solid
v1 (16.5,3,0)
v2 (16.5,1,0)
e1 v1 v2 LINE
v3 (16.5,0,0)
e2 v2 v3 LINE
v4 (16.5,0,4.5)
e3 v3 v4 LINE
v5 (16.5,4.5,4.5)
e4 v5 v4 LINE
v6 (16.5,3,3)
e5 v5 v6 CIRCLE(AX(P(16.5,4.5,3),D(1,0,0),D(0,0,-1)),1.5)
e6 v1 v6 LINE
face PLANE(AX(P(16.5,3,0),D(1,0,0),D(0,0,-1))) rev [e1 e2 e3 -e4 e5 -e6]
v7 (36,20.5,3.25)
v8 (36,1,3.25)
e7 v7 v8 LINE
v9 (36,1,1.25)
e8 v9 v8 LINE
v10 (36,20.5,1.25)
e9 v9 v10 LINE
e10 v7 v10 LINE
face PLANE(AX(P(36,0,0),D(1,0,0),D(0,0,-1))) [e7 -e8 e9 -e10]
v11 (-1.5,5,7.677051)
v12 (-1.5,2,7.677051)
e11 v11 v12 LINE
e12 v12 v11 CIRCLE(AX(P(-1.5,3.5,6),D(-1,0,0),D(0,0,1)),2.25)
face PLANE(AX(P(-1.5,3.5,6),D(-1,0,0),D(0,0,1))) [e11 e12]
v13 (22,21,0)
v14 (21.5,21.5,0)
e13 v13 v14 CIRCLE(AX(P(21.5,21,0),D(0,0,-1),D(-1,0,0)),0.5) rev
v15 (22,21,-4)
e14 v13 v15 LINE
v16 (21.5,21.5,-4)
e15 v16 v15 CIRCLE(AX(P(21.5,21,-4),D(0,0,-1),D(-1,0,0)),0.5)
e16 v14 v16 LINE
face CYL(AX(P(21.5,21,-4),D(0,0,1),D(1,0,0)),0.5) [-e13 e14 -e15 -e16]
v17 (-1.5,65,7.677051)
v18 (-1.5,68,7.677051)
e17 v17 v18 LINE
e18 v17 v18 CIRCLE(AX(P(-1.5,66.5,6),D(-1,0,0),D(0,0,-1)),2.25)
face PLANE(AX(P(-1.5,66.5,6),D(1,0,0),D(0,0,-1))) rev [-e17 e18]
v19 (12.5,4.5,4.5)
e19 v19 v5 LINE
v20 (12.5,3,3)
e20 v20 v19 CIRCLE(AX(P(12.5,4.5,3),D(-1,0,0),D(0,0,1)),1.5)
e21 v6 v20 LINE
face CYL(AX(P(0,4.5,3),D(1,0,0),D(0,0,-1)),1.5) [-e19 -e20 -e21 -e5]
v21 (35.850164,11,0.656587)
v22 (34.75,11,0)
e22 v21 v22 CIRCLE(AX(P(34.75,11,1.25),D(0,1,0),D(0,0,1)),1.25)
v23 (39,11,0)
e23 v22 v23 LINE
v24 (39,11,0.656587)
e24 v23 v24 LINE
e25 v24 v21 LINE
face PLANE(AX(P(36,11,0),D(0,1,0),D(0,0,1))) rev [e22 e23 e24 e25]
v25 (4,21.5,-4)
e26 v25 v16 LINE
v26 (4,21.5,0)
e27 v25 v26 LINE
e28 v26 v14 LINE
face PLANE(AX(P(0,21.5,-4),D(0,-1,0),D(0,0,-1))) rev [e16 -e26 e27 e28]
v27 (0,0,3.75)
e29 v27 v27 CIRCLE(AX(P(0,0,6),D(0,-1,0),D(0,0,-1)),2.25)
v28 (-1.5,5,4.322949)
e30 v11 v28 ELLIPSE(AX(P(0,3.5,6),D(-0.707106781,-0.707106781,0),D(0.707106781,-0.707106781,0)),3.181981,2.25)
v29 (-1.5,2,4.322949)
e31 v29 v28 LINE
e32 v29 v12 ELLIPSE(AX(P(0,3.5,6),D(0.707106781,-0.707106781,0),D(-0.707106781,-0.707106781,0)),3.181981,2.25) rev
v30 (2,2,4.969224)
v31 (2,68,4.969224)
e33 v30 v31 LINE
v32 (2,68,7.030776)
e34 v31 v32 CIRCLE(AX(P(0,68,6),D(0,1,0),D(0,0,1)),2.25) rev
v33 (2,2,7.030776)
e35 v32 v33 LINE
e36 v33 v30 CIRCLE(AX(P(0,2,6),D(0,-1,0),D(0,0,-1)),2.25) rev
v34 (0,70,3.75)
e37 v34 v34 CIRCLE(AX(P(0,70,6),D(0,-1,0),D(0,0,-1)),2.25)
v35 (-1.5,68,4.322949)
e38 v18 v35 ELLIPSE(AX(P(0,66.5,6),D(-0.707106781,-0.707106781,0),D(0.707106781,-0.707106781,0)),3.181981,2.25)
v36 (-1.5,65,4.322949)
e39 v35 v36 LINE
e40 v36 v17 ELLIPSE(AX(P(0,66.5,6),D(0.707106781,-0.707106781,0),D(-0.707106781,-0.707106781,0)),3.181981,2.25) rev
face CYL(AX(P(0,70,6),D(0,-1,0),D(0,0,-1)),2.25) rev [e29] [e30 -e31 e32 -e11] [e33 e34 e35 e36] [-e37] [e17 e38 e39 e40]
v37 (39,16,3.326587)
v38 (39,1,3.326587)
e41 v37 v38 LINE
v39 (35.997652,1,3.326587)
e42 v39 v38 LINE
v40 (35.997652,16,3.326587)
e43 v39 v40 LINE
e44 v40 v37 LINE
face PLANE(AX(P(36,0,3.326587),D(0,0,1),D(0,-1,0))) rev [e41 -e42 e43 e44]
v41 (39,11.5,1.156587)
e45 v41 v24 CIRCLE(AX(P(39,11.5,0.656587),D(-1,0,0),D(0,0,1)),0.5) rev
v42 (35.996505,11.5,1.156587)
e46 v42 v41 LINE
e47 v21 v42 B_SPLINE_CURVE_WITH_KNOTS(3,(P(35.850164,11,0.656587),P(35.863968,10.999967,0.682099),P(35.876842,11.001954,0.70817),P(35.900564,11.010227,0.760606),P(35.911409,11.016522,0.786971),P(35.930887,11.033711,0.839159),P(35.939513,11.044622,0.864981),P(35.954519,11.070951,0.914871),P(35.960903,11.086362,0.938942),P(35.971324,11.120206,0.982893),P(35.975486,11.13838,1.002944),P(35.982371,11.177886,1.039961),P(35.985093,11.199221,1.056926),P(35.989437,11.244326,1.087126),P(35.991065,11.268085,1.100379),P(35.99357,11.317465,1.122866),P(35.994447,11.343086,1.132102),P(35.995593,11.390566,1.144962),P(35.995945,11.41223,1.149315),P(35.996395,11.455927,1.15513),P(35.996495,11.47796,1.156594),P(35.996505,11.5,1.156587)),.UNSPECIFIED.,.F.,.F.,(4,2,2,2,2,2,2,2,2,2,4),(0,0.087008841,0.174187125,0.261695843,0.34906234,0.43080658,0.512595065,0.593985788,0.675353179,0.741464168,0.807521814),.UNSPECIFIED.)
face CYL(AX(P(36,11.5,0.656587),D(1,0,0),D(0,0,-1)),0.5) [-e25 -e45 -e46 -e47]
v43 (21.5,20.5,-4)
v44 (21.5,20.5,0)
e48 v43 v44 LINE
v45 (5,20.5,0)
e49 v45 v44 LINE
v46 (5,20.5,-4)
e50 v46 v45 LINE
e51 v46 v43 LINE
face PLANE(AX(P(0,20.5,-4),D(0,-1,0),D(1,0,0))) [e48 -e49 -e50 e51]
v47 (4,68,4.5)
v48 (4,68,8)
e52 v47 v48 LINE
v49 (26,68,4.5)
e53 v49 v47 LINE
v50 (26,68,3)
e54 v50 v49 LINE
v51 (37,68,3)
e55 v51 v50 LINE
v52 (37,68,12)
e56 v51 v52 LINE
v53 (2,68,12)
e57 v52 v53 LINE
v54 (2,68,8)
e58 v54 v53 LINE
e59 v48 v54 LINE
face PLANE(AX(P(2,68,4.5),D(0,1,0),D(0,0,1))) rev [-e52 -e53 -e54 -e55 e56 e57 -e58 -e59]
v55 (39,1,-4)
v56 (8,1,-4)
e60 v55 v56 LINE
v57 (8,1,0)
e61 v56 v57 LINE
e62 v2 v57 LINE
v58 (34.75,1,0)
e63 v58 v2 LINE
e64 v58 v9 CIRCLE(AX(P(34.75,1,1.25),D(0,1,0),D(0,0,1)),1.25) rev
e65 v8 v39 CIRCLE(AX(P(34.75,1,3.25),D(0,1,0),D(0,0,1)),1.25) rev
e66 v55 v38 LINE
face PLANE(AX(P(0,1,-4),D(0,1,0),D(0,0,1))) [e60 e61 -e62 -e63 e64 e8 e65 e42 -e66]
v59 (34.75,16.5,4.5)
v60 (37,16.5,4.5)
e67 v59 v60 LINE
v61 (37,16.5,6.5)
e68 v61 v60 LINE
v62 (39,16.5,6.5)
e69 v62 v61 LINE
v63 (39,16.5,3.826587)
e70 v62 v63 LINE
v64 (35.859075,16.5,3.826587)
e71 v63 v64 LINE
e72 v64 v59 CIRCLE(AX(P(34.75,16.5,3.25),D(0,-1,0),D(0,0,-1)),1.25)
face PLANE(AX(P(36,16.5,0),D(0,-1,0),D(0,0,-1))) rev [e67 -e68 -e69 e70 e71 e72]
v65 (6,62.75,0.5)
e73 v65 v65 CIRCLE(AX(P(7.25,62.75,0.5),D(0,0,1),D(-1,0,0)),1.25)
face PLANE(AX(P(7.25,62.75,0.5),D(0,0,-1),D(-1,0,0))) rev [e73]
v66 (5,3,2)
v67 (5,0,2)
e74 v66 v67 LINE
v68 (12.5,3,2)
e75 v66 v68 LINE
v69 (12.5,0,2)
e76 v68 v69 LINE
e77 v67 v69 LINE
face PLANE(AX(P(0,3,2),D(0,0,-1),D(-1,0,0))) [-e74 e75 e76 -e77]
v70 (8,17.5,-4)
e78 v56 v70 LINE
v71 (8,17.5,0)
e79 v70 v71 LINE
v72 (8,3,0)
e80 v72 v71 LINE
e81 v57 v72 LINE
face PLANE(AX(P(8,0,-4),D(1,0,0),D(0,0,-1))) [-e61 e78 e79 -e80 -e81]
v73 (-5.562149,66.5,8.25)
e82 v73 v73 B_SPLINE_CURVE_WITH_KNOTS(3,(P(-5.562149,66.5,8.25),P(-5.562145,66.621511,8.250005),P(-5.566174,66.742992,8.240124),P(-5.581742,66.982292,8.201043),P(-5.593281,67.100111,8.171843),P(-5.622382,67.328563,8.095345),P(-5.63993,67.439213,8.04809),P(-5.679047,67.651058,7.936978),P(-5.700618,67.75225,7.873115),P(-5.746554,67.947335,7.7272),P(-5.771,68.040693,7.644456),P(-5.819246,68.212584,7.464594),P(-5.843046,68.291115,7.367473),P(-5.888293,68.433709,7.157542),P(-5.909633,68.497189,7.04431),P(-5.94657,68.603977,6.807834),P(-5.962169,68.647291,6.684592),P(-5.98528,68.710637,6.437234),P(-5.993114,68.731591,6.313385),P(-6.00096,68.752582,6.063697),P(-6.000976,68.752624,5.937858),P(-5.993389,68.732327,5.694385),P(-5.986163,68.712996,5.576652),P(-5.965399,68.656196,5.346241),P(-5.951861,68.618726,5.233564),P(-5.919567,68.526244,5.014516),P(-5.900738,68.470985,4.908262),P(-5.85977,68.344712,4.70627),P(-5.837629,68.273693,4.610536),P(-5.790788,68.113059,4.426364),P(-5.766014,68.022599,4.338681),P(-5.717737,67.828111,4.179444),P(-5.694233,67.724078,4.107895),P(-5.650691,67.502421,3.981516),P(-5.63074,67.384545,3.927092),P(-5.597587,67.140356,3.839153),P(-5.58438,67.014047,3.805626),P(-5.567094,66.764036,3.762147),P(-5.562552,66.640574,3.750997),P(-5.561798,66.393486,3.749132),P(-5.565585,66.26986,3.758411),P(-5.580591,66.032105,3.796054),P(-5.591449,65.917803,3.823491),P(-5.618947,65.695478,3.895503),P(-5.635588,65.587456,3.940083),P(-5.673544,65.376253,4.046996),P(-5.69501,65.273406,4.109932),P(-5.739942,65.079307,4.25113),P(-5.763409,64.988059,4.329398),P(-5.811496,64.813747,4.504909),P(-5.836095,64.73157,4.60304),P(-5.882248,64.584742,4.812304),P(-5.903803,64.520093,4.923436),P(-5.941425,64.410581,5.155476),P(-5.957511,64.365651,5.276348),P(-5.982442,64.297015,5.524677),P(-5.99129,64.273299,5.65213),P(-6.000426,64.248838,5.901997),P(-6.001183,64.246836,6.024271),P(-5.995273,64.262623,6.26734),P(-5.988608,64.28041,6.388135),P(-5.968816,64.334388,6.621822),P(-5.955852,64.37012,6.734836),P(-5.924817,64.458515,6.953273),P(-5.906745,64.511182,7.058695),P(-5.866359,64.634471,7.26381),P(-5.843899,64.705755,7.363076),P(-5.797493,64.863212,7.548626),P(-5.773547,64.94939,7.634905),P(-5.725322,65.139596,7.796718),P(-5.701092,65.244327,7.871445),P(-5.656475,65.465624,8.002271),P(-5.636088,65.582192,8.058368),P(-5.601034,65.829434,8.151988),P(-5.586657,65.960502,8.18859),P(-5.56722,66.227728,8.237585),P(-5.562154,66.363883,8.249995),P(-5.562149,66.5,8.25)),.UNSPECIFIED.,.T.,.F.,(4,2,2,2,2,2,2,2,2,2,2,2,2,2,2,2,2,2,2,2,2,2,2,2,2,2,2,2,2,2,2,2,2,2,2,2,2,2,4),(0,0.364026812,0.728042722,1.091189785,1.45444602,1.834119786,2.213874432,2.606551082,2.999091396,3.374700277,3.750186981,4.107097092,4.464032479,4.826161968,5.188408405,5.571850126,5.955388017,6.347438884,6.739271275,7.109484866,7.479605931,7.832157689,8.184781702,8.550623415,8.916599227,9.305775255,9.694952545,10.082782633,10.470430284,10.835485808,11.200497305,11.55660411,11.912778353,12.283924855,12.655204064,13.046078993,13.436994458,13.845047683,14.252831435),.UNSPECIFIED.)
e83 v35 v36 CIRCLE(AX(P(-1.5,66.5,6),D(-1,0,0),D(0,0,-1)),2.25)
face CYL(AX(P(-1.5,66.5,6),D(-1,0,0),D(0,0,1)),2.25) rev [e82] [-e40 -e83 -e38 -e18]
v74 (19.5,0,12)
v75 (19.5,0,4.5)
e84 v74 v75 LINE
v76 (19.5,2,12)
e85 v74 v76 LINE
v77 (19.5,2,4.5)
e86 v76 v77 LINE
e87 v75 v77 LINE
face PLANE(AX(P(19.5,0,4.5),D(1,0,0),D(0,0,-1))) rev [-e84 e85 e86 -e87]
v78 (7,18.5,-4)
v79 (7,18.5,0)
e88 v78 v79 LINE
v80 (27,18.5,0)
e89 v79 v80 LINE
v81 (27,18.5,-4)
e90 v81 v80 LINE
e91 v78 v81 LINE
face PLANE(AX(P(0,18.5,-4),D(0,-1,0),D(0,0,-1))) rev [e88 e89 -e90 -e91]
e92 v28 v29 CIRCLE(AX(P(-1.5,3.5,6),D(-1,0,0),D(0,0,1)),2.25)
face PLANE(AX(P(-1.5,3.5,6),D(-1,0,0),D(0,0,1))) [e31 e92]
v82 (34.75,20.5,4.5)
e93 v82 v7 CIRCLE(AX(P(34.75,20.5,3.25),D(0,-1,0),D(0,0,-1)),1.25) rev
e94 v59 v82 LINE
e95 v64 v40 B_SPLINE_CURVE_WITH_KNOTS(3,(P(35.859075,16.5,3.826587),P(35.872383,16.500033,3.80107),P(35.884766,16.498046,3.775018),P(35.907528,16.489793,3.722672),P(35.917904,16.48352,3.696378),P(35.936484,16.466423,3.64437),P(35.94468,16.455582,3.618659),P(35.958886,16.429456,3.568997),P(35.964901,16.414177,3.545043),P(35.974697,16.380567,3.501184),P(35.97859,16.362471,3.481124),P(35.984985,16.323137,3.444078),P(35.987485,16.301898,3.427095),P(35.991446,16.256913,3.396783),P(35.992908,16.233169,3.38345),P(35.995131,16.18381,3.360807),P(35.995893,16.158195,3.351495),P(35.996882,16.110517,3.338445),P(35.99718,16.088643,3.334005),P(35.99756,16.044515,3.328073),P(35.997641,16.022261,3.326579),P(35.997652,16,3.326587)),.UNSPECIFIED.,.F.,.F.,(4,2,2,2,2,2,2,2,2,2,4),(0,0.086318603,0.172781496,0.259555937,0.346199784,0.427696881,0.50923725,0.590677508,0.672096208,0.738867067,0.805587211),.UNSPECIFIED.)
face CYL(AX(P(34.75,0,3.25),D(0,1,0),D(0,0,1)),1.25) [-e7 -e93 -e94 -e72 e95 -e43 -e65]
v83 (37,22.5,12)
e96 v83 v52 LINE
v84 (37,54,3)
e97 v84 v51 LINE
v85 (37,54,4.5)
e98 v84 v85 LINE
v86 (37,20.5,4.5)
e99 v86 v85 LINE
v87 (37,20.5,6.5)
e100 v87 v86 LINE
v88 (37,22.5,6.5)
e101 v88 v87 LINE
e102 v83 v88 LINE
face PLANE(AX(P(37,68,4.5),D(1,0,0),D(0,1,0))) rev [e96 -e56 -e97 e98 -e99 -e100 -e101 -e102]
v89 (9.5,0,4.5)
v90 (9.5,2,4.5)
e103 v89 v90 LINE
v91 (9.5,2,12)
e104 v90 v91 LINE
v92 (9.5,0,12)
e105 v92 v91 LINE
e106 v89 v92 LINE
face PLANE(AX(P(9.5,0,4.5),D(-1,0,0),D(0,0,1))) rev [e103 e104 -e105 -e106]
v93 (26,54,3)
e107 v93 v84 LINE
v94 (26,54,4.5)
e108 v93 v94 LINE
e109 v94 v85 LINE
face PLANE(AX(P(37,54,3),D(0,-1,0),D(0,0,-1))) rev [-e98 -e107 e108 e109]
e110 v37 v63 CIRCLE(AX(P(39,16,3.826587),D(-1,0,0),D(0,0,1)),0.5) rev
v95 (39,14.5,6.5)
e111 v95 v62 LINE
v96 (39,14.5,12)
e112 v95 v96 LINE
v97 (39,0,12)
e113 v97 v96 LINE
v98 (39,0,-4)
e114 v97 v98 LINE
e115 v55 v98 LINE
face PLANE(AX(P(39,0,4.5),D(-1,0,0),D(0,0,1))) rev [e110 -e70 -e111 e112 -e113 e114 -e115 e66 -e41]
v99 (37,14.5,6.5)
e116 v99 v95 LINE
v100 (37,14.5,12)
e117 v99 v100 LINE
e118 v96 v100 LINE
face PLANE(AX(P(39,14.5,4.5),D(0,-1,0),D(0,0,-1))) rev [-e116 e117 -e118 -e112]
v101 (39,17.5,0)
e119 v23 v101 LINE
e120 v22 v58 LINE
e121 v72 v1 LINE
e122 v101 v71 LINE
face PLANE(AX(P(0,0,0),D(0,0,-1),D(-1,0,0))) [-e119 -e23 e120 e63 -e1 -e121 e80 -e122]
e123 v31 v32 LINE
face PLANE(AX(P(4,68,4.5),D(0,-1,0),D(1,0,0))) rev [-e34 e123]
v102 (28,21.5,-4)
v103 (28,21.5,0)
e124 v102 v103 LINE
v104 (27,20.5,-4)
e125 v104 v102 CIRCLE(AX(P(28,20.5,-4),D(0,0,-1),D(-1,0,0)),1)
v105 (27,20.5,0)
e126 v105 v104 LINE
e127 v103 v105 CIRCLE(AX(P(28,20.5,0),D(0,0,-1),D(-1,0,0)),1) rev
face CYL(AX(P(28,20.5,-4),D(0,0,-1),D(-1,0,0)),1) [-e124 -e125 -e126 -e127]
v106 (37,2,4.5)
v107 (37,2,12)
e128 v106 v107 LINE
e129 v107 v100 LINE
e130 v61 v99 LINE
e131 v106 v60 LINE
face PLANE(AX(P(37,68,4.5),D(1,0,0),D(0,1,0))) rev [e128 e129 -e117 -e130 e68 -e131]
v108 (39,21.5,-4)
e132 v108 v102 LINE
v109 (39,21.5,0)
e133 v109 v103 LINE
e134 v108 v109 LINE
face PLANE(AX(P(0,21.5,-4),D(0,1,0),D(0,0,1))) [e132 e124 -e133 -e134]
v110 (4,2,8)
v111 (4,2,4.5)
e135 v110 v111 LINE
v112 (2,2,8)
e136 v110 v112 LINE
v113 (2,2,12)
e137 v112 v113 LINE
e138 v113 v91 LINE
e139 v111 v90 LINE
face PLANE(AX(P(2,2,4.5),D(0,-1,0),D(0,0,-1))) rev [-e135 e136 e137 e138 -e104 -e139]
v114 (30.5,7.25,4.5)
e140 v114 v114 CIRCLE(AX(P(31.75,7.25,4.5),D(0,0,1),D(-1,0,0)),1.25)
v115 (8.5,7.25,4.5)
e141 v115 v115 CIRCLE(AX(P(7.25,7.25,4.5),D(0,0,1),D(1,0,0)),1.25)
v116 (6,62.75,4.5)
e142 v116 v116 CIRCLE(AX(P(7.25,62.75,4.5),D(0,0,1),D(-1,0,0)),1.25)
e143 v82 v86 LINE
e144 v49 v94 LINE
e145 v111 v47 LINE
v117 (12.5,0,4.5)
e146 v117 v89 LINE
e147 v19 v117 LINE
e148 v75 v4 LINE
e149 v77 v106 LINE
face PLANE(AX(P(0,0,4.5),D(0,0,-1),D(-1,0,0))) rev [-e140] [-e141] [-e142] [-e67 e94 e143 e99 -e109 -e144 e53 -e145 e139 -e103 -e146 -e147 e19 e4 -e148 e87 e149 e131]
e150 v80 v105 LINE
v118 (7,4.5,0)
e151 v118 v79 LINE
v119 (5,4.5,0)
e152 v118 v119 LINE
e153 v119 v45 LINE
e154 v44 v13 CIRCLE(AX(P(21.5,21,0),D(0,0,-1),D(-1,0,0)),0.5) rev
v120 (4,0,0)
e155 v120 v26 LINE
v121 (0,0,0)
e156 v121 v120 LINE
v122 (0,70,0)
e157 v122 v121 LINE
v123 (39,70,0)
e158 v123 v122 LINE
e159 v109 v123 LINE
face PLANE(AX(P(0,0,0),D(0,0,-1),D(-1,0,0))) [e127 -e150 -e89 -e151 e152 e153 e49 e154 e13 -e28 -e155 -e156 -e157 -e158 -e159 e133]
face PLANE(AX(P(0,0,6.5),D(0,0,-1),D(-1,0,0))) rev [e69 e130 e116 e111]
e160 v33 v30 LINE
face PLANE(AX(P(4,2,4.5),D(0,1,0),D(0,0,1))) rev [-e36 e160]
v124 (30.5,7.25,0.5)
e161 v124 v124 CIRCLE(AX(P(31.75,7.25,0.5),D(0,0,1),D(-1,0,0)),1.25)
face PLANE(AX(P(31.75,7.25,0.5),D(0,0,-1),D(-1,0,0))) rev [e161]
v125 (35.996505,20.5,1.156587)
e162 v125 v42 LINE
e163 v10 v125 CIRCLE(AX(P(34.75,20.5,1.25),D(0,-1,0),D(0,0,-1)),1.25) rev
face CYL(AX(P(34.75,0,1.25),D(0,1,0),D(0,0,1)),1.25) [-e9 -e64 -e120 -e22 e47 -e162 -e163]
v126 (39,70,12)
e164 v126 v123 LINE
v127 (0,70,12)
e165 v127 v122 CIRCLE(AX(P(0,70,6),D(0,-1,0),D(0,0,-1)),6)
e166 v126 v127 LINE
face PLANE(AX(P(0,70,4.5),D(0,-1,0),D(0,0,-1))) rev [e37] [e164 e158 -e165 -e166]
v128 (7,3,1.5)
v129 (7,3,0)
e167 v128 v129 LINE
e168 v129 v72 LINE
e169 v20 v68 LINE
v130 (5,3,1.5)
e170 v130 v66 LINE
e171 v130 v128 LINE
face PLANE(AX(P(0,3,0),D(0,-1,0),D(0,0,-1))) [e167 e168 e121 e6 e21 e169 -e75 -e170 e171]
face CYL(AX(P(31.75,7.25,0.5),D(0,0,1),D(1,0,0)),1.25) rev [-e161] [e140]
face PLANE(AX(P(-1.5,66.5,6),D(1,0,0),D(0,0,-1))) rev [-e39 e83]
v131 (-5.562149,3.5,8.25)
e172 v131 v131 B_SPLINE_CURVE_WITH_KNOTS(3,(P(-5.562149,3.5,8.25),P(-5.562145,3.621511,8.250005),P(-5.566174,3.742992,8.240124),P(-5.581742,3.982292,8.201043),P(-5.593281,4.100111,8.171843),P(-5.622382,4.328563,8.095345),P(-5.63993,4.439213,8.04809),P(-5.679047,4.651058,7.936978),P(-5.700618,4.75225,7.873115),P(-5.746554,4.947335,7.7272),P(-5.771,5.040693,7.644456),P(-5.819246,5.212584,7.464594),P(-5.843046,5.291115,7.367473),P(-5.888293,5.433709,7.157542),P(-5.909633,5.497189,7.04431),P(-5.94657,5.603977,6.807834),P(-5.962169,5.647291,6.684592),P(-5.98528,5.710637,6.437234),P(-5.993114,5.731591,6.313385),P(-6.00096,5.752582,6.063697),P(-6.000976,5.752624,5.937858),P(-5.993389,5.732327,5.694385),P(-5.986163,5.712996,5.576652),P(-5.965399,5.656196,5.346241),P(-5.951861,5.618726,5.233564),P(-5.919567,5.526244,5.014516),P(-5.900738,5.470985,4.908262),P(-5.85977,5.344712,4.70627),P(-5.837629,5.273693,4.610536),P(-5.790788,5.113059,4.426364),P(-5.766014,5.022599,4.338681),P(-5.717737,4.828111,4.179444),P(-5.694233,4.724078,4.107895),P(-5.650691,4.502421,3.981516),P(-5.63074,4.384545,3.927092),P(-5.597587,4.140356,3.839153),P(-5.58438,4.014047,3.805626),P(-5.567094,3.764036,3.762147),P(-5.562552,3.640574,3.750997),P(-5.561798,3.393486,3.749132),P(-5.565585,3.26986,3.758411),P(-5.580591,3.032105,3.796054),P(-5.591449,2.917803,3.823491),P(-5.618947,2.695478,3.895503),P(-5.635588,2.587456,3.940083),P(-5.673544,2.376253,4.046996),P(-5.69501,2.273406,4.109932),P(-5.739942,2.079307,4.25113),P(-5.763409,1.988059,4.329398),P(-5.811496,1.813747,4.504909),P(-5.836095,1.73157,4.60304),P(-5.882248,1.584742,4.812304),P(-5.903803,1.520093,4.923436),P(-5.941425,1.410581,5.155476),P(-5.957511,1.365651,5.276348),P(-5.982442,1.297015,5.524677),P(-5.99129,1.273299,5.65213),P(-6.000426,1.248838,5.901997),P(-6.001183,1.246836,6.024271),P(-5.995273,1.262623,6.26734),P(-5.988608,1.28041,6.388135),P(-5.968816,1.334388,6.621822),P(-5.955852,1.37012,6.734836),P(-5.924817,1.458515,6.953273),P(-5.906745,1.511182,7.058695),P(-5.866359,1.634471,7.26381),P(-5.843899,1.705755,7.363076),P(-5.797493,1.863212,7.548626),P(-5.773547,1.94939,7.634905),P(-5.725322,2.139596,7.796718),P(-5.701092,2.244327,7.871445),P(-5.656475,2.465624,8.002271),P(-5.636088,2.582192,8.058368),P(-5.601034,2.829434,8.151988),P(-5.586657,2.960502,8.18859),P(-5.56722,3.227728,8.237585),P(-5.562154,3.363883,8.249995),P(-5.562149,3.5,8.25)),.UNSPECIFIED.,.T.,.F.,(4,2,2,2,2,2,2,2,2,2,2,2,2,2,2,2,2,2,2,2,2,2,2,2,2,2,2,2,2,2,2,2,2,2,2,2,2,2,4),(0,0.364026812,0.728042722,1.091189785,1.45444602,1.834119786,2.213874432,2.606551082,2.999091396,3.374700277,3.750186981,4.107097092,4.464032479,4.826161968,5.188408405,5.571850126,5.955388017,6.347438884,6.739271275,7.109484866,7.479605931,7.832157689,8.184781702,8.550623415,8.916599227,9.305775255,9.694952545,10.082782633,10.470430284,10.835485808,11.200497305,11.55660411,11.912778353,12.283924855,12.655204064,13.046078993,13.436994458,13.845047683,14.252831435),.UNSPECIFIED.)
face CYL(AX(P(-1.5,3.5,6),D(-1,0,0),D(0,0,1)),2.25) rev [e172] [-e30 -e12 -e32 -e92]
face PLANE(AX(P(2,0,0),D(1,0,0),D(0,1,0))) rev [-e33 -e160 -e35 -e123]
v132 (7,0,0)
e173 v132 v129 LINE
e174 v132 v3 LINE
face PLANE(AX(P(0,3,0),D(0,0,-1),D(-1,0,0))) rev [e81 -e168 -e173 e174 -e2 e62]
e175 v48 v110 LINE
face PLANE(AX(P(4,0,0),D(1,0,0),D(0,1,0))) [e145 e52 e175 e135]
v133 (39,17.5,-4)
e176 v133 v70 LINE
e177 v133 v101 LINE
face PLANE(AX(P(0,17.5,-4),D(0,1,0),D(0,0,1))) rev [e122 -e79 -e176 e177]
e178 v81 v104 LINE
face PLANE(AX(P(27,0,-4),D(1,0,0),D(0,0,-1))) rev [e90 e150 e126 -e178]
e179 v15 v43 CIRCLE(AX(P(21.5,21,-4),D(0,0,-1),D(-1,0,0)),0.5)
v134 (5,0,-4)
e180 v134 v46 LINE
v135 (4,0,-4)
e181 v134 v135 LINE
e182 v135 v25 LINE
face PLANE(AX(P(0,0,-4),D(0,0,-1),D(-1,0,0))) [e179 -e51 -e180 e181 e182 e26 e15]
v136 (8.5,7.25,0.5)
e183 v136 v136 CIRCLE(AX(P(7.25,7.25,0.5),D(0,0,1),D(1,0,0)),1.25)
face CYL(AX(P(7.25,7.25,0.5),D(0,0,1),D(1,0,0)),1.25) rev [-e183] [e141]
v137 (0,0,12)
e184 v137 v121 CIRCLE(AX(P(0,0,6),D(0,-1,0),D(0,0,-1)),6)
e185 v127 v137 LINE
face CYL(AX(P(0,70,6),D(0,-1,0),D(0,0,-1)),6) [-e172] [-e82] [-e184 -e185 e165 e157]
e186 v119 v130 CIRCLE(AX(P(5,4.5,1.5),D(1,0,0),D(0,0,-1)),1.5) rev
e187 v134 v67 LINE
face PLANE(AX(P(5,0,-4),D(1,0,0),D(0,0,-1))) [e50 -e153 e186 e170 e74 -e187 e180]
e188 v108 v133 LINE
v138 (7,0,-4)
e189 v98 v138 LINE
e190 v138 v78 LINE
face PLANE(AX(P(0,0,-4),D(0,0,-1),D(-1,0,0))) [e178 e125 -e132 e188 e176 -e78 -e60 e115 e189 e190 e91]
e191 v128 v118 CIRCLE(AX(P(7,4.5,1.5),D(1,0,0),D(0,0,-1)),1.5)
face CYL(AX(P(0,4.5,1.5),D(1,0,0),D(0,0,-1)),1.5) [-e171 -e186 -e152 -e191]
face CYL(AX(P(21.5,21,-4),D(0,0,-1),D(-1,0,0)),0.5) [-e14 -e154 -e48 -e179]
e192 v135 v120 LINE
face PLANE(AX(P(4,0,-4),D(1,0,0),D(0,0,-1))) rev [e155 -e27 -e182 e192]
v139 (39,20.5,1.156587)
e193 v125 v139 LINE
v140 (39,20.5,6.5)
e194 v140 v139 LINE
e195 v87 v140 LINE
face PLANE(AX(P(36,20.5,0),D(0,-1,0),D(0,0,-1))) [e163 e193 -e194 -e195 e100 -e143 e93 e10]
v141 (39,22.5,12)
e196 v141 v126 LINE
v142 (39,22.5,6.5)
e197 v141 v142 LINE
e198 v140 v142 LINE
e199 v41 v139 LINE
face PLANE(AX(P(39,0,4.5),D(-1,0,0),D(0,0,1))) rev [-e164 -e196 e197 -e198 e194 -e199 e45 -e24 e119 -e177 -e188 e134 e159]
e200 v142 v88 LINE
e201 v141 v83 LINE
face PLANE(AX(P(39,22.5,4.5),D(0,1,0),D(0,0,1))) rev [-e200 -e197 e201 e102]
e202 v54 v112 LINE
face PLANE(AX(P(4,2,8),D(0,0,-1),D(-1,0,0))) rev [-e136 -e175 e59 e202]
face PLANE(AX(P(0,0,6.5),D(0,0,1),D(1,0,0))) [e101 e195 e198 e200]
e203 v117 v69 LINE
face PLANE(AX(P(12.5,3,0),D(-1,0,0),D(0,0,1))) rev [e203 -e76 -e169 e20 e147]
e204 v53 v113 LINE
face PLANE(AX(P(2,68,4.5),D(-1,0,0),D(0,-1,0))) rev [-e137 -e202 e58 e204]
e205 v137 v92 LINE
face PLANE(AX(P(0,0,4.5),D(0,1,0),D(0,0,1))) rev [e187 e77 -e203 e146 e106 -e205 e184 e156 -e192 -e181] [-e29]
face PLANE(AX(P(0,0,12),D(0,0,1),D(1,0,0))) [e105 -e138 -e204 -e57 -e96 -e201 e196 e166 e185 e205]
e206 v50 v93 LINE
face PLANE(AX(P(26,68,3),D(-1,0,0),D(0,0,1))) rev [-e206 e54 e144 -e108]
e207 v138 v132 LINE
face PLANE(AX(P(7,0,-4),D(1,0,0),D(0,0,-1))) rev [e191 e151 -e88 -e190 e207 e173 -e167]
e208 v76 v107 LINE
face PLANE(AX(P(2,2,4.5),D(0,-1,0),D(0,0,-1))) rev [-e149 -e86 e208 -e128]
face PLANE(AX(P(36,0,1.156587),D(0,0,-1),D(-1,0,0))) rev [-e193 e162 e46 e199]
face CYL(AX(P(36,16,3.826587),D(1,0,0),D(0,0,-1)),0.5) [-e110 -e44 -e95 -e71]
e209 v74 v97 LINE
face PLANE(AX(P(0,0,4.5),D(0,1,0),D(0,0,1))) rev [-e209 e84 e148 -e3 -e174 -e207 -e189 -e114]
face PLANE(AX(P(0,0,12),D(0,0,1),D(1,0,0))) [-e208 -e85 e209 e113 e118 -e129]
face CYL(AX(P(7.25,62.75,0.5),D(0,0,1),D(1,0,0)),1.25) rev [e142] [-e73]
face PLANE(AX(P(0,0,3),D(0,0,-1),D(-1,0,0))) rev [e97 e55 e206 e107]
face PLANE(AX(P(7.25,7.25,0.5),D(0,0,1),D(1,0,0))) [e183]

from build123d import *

# Parameters (mm, degrees)
SKETCH1_W                = 39
SKETCH1_H                = 70
BASE_DEPTH               = 4.5
SKETCH2_W                = 4
SKETCH2_H                = 62
WALLS_DEPTH              = 7.5
SKETCH3_W                = 10
SKETCH3_H                = 7.5
PWR_CONNECTOR_HOLE_DEPTH = 4
SKETCH4_W                = 7.5
SKETCH4_H                = 8
GPS_CONNECTOR_HOLE_DEPTH = 4
SKETCH5_R                = 1.25
MOUNTING_HOLES_DEPTH     = 4
GPS_MOUNT_DEPTH          = 4
SKETCH11_W               = 17
SKETCH11_H               = 1
SKETCH11_W_2             = 12
SKETCH11_H_2             = 3
PWR_CABLE_HOLDER1_DEPTH  = 4
SKETCH12_W               = 4
SKETCH12_H               = 2.5
PWR_CABLE_HOLDER2_DEPTH  = 3
PWR_FILLET_R             = 1.5
PWR_FILLET2_R            = 1
PWR_FILLET3_R            = 0.5
GPS_CABLE_HOLDER_DEPTH   = 3
GPS_START                = 1
GPS_FILLET_DEPTH         = 10
GPS_START_2              = 16.5
GPS_FILLET_2_DEPTH       = 4
GPS_START_3              = 9.15727
GPS_FILLET_3_DEPTH       = 8.34273
GPS_FILLET_2_2_R         = 0.5
SKETCH15_R               = 6
BALLON_MOUNT_DEPTH       = 70
SKETCH16_R               = 2.25
BALLOON_MOUNT_HOLE_DEPTH = 70
SKETCH21_R               = 2.25
SAFETY_MOUNT_DEPTH       = 4.5
SKETCH22_W               = 35
SKETCH22_H               = 66
LID_HOLE_DEPTH           = 7.5
SKETCH25_W               = 3.5
SKETCH25_H               = 66
CORRECTION_DEPTH         = 2
SKETCH28_W               = 2
SKETCH28_H               = 2
SMALLER_WALLS_DEPTH      = 2
SKETCH29_W               = 11
SKETCH29_H               = 14
ANTENNA_SPACE_DEPTH      = 1.5


with BuildPart() as part:
    # Sketch1 → Base (new body)
    with BuildSketch(Plane.XY):
        with Locations((19.5, 35)):
            Rectangle(SKETCH1_W, SKETCH1_H)
    extrude(amount=BASE_DEPTH)

    # Sketch2 → Walls (add)
    with BuildSketch(Plane.XY.offset(4.5)):
        Polygon((39, 66), (39, 70), (0, 70), (0, 66), (4, 66), (35, 66), align=None)
        with Locations((37, 35)):
            Rectangle(SKETCH2_W, SKETCH2_H)
        Polygon((4, 66), (0, 66), (0, 0), (4, 0), (4, 4), align=None)
        Polygon((39, 0), (39, 4), (35, 4), (4, 4), (4, 0), align=None)
    extrude(amount=WALLS_DEPTH)

    # Sketch3 → PWR connector hole (cut)
    with BuildSketch(Plane(origin=(0, 4, 0), x_dir=(1, 0, 0), z_dir=(0, 1, 0))):
        with Locations((14.5, -8.25)):
            Rectangle(SKETCH3_W, SKETCH3_H)
    extrude(amount=-PWR_CONNECTOR_HOLE_DEPTH, mode=Mode.SUBTRACT)

    # Sketch4 → GPS connector hole (cut)
    with BuildSketch(Plane.ZY.offset(-35)):
        with Locations((8.25, 18.5)):
            Rectangle(SKETCH4_W, SKETCH4_H)
    extrude(amount=-GPS_CONNECTOR_HOLE_DEPTH, mode=Mode.SUBTRACT)

    # Sketch5 → Mounting holes (cut)
    with BuildSketch(Plane.XY.offset(4.5)):
        with Locations((7.25, 7.25)):
            Circle(SKETCH5_R)
        with Locations(Location((31.75, 7.25, 0), (0, 0, 180))):
            Circle(SKETCH5_R)
        with Locations(Location((7.25, 62.75, 0), (0, 0, 180))):
            Circle(SKETCH5_R)
    extrude(amount=-MOUNTING_HOLES_DEPTH, mode=Mode.SUBTRACT)

    # Sketch7 → GPS mount (add)
    with BuildSketch(Plane(origin=(0, 0, 0), x_dir=(-1, 0, 0), z_dir=(0, 0, -1))):
        Polygon((-39, 1), (-39, 0), (-7, 0), (-7, 18.5), (-39, 18.5), (-39, 17.5), (-8, 17.5), (-8, 1), align=None)
    extrude(amount=GPS_MOUNT_DEPTH)

    # Sketch11 → PWR cable holder1 (add)
    with BuildSketch(Plane(origin=(0, 0, 0), x_dir=(-1, 0, 0), z_dir=(0, 0, -1))):
        Polygon((-5, 0), (-4, 0), (-4, 21.5), (-5, 21.5), (-5, 20.5), align=None)
        with Locations((-13.5, 21)):
            Rectangle(SKETCH11_W, SKETCH11_H)
        with Locations((-33, 20)):
            Rectangle(SKETCH11_W_2, SKETCH11_H_2)
    extrude(amount=PWR_CABLE_HOLDER1_DEPTH)

    # Sketch12 → PWR cable holder2 (cut)
    with BuildSketch(Plane.XZ):
        Polygon((5, 2), (5, 0), (7, 0), (16.5, 0), (16.5, 2), (12.5, 2), align=None)
        with Locations((14.5, 3.25)):
            Rectangle(SKETCH12_W, SKETCH12_H)
    extrude(amount=-PWR_CABLE_HOLDER2_DEPTH, mode=Mode.SUBTRACT)

    # PWR fillet
    pwr_fillet_edges = [part.edges().sort_by_distance(p)[0] for p in [
        (6, 3, 0),
        (14.5, 3, 4.5),
    ]]
    fillet(pwr_fillet_edges, radius=PWR_FILLET_R)

    # PWR fillet2
    pwr_fillet2_edges = [part.edges().sort_by_distance(p)[0] for p in [
        (27, 21.5, -2),
    ]]
    fillet(pwr_fillet2_edges, radius=PWR_FILLET2_R)

    # PWR fillet3
    pwr_fillet3_edges = [part.edges().sort_by_distance(p)[0] for p in [
        (22, 21.5, -2),
        (22, 20.5, -2),
    ]]
    fillet(pwr_fillet3_edges, radius=PWR_FILLET3_R - 0.0001)  # a hair under: the kernel refuses the full size

    # Sketch13 → GPS cable holder (cut)
    with BuildSketch(Plane(origin=(39, 0, 0), x_dir=(0, 0, -1), z_dir=(1, 0, 0))):
        Polygon((-1.156586719, 11), (-2.326586719, 11), (-2.326586719, 1), (0, 1), (0, 11), align=None)
        Polygon((-2.326586719, 11), (-2.326586719, 16.5), (-3.326586719, 16.5), (-3.326586719, 1), (-2.326586719, 1), align=None)
        Polygon((-1.156586719, 20.5), (-2.326586719, 20.5), (-2.326586719, 16.5), (-2.326586719, 11), (-1.156586719, 11), align=None)
        Polygon((-2.326586719, 20.5), (-4.5, 20.5), (-4.5, 16.5), (-3.326586719, 16.5), (-2.326586719, 16.5), align=None)
    extrude(amount=-GPS_CABLE_HOLDER_DEPTH, mode=Mode.SUBTRACT)

    # GPS fillet: read off the stored shape, not the designer's step
    # GPS fillet outline → GPS fillet (cut)
    with BuildSketch(Plane(origin=(0, 0, 0), x_dir=(1, 0, 0), z_dir=(0, 1, 0)).offset(GPS_START)):
        with BuildLine():
            Line((36, -3.326586719), (36, -3.25))
            ThreePointArc((36, -3.25), (35.999412758, -3.288311358), (35.997651584, -3.326586719))
            Line((35.997651584, -3.326586719), (36, -3.326586719))
        make_face()
        with BuildLine():
            Line((36, -1.25), (36, 0))
            Line((36, 0), (34.75, 0))
            ThreePointArc((34.75, 0), (35.633883476, -0.366116524), (36, -1.25))
        make_face()
    extrude(amount=GPS_FILLET_DEPTH, mode=Mode.SUBTRACT)

    # GPS fillet 2 outline → GPS fillet 2 (cut)
    with BuildSketch(Plane(origin=(0, 0, 0), x_dir=(1, 0, 0), z_dir=(0, 1, 0)).offset(GPS_START_2)):
        with BuildLine():
            ThreePointArc((36, -3.25), (35.633883476, -4.133883476), (34.75, -4.5))
            Line((34.75, -4.5), (36, -4.5))
            Line((36, -4.5), (36, -3.25))
        make_face()
        with BuildLine():
            ThreePointArc((35.996504697, -1.156586719), (35.999125868, -1.203260674), (36, -1.25))
            Line((36, -1.25), (36, -1.156586719))
            Line((36, -1.156586719), (35.996504697, -1.156586719))
        make_face()
    extrude(amount=GPS_FILLET_2_DEPTH, mode=Mode.SUBTRACT)

    # GPS fillet 3 outline → GPS fillet 3 (cut)
    with BuildSketch(Plane(origin=(0, 0, 0), x_dir=(1, 0, 0), z_dir=(0, 1, 0)).offset(GPS_START_3)):
        with BuildLine():
            Line((36, -3.326586719), (36, -3.25))
            ThreePointArc((36, -3.25), (35.999412758, -3.288311358), (35.997651584, -3.326586719))
            Line((35.997651584, -3.326586719), (36, -3.326586719))
        make_face()
        with BuildLine():
            ThreePointArc((35.996504697, -1.156586719), (35.999125868, -1.203260674), (36, -1.25))
            Line((36, -1.25), (36, -1.156586719))
            Line((36, -1.156586719), (35.996504697, -1.156586719))
        make_face()
    extrude(amount=GPS_FILLET_3_DEPTH, mode=Mode.SUBTRACT)

    # GPS fillet 2 2
    # the kernel refuses this fillet: 0.5 mm, written as the material it takes off along each edge
    with BuildSketch(Plane(origin=(40.25, 11, 1.156586719), x_dir=(0, 0, -1), z_dir=(-1, 0, 0))) as gps_fillet_2_2_piece_1:
        with BuildLine():
            CenterArc((GPS_FILLET_2_2_R, -GPS_FILLET_2_2_R), GPS_FILLET_2_2_R, 90, 90)
            Line((0, -GPS_FILLET_2_2_R), (0, 0))
            Line((0, 0), (GPS_FILLET_2_2_R, 0))
        make_face()
    extrude(amount=4.25, mode=Mode.SUBTRACT)
    with BuildSketch(Plane(origin=(40.25, 16.5, 3.326586719), x_dir=(0, -1, 0), z_dir=(-1, 0, 0))) as gps_fillet_2_2_piece_2:
        with BuildLine():
            CenterArc((GPS_FILLET_2_2_R, GPS_FILLET_2_2_R), GPS_FILLET_2_2_R, 180, 90)
            Line((0, GPS_FILLET_2_2_R), (0, 0))
            Line((0, 0), (GPS_FILLET_2_2_R, 0))
        make_face()
    extrude(amount=4.25, mode=Mode.SUBTRACT)
    with BuildSketch(Plane(origin=(36, 16.5, 3.326586719), x_dir=(0, -1.0, 5.126796764898245e-10), z_dir=(-1, 0, 0))) as gps_fillet_2_2_piece_3_section:
        with BuildLine():
            CenterArc((GPS_FILLET_2_2_R, GPS_FILLET_2_2_R), GPS_FILLET_2_2_R, 179.999999971, 90)
            Line((GPS_FILLET_2_2_R * 5.12679676753e-10, GPS_FILLET_2_2_R), (0, 0))
            Line((0, 0), (GPS_FILLET_2_2_R, 0))
        make_face()
    gps_fillet_2_2_piece_3 = extrude(amount=1.252348417, mode=Mode.PRIVATE)
    gps_fillet_2_2_piece_3 = gps_fillet_2_2_piece_3 - Plane(origin=(34.749999755, 16.5, 3.249999996), x_dir=(1.0, 0, 2.949740140725451e-09), z_dir=(0, -1, 0)) * Cylinder(1.250000245, 5, mode=Mode.PRIVATE)
    add(gps_fillet_2_2_piece_3, mode=Mode.SUBTRACT)
    with BuildSketch(Plane(origin=(34.746504697, 11, 1.156586719), x_dir=(0, 0, -1), z_dir=(1, 0, 0))) as gps_fillet_2_2_piece_4_section:
        with BuildLine():
            CenterArc((GPS_FILLET_2_2_R, GPS_FILLET_2_2_R), GPS_FILLET_2_2_R, 180, 90)
            Line((-GPS_FILLET_2_2_R * 5.12674791509e-10, GPS_FILLET_2_2_R), (0, 0))
            Line((0, 0), (GPS_FILLET_2_2_R, 0))
        make_face()
    gps_fillet_2_2_piece_4 = extrude(amount=1.253495303, mode=Mode.PRIVATE)
    gps_fillet_2_2_piece_4 = gps_fillet_2_2_piece_4 - Plane(origin=(34.749999998, 11, 1.250000002), x_dir=(1.3197563913171698e-09, 0, -1.0), z_dir=(0, -1, 0)) * Cylinder(1.250000002, 5, mode=Mode.PRIVATE)
    add(gps_fillet_2_2_piece_4, mode=Mode.SUBTRACT)

    # Sketch15 → Ballon mount (add)
    with BuildSketch(Plane.XZ):
        with Locations((0, 6)):
            Circle(SKETCH15_R)
    extrude(amount=-BALLON_MOUNT_DEPTH)

    # Sketch16 → Balloon mount hole (cut)
    with BuildSketch(Plane.XZ):
        with Locations(Location((0, 6, 0), (0, 0, 270))):
            Circle(SKETCH16_R)
    extrude(amount=-BALLOON_MOUNT_HOLE_DEPTH, mode=Mode.SUBTRACT)

    # Sketch21 → Safety mount (cut)
    with BuildSketch(Plane.ZY.offset(6)):
        with Locations((6, 3.5)):
            Circle(SKETCH21_R)
        with Locations((6, 66.5)):
            Circle(SKETCH21_R)
    extrude(amount=-SAFETY_MOUNT_DEPTH, mode=Mode.SUBTRACT)

    # Sketch22 → Lid hole (cut)
    with BuildSketch(Plane.XY.offset(12)):
        with Locations((19.5, 35)):
            Rectangle(SKETCH22_W, SKETCH22_H)
    extrude(amount=-LID_HOLE_DEPTH, mode=Mode.SUBTRACT)

    # Sketch25 → Correction (add)
    with BuildSketch(Plane(origin=(2, 0, 0), x_dir=(0, 0, -1), z_dir=(1, 0, 0))):
        with Locations((-6.25, 35)):
            Rectangle(SKETCH25_W, SKETCH25_H)
    extrude(amount=CORRECTION_DEPTH)

    # Sketch28 → Smaller walls (add)
    with BuildSketch(Plane.XY.offset(4.5)):
        with Locations((38, 21.5)):
            Rectangle(SKETCH28_W, SKETCH28_H)
        with Locations((38, 15.5)):
            Rectangle(SKETCH28_W, SKETCH28_H)
    extrude(amount=SMALLER_WALLS_DEPTH)

    # Sketch29 → Antenna space (cut)
    with BuildSketch(Plane.XY.offset(4.5)):
        with Locations((31.5, 61)):
            Rectangle(SKETCH29_W, SKETCH29_H)
    extrude(amount=-ANTENNA_SPACE_DEPTH, mode=Mode.SUBTRACT)


solid = part.part
